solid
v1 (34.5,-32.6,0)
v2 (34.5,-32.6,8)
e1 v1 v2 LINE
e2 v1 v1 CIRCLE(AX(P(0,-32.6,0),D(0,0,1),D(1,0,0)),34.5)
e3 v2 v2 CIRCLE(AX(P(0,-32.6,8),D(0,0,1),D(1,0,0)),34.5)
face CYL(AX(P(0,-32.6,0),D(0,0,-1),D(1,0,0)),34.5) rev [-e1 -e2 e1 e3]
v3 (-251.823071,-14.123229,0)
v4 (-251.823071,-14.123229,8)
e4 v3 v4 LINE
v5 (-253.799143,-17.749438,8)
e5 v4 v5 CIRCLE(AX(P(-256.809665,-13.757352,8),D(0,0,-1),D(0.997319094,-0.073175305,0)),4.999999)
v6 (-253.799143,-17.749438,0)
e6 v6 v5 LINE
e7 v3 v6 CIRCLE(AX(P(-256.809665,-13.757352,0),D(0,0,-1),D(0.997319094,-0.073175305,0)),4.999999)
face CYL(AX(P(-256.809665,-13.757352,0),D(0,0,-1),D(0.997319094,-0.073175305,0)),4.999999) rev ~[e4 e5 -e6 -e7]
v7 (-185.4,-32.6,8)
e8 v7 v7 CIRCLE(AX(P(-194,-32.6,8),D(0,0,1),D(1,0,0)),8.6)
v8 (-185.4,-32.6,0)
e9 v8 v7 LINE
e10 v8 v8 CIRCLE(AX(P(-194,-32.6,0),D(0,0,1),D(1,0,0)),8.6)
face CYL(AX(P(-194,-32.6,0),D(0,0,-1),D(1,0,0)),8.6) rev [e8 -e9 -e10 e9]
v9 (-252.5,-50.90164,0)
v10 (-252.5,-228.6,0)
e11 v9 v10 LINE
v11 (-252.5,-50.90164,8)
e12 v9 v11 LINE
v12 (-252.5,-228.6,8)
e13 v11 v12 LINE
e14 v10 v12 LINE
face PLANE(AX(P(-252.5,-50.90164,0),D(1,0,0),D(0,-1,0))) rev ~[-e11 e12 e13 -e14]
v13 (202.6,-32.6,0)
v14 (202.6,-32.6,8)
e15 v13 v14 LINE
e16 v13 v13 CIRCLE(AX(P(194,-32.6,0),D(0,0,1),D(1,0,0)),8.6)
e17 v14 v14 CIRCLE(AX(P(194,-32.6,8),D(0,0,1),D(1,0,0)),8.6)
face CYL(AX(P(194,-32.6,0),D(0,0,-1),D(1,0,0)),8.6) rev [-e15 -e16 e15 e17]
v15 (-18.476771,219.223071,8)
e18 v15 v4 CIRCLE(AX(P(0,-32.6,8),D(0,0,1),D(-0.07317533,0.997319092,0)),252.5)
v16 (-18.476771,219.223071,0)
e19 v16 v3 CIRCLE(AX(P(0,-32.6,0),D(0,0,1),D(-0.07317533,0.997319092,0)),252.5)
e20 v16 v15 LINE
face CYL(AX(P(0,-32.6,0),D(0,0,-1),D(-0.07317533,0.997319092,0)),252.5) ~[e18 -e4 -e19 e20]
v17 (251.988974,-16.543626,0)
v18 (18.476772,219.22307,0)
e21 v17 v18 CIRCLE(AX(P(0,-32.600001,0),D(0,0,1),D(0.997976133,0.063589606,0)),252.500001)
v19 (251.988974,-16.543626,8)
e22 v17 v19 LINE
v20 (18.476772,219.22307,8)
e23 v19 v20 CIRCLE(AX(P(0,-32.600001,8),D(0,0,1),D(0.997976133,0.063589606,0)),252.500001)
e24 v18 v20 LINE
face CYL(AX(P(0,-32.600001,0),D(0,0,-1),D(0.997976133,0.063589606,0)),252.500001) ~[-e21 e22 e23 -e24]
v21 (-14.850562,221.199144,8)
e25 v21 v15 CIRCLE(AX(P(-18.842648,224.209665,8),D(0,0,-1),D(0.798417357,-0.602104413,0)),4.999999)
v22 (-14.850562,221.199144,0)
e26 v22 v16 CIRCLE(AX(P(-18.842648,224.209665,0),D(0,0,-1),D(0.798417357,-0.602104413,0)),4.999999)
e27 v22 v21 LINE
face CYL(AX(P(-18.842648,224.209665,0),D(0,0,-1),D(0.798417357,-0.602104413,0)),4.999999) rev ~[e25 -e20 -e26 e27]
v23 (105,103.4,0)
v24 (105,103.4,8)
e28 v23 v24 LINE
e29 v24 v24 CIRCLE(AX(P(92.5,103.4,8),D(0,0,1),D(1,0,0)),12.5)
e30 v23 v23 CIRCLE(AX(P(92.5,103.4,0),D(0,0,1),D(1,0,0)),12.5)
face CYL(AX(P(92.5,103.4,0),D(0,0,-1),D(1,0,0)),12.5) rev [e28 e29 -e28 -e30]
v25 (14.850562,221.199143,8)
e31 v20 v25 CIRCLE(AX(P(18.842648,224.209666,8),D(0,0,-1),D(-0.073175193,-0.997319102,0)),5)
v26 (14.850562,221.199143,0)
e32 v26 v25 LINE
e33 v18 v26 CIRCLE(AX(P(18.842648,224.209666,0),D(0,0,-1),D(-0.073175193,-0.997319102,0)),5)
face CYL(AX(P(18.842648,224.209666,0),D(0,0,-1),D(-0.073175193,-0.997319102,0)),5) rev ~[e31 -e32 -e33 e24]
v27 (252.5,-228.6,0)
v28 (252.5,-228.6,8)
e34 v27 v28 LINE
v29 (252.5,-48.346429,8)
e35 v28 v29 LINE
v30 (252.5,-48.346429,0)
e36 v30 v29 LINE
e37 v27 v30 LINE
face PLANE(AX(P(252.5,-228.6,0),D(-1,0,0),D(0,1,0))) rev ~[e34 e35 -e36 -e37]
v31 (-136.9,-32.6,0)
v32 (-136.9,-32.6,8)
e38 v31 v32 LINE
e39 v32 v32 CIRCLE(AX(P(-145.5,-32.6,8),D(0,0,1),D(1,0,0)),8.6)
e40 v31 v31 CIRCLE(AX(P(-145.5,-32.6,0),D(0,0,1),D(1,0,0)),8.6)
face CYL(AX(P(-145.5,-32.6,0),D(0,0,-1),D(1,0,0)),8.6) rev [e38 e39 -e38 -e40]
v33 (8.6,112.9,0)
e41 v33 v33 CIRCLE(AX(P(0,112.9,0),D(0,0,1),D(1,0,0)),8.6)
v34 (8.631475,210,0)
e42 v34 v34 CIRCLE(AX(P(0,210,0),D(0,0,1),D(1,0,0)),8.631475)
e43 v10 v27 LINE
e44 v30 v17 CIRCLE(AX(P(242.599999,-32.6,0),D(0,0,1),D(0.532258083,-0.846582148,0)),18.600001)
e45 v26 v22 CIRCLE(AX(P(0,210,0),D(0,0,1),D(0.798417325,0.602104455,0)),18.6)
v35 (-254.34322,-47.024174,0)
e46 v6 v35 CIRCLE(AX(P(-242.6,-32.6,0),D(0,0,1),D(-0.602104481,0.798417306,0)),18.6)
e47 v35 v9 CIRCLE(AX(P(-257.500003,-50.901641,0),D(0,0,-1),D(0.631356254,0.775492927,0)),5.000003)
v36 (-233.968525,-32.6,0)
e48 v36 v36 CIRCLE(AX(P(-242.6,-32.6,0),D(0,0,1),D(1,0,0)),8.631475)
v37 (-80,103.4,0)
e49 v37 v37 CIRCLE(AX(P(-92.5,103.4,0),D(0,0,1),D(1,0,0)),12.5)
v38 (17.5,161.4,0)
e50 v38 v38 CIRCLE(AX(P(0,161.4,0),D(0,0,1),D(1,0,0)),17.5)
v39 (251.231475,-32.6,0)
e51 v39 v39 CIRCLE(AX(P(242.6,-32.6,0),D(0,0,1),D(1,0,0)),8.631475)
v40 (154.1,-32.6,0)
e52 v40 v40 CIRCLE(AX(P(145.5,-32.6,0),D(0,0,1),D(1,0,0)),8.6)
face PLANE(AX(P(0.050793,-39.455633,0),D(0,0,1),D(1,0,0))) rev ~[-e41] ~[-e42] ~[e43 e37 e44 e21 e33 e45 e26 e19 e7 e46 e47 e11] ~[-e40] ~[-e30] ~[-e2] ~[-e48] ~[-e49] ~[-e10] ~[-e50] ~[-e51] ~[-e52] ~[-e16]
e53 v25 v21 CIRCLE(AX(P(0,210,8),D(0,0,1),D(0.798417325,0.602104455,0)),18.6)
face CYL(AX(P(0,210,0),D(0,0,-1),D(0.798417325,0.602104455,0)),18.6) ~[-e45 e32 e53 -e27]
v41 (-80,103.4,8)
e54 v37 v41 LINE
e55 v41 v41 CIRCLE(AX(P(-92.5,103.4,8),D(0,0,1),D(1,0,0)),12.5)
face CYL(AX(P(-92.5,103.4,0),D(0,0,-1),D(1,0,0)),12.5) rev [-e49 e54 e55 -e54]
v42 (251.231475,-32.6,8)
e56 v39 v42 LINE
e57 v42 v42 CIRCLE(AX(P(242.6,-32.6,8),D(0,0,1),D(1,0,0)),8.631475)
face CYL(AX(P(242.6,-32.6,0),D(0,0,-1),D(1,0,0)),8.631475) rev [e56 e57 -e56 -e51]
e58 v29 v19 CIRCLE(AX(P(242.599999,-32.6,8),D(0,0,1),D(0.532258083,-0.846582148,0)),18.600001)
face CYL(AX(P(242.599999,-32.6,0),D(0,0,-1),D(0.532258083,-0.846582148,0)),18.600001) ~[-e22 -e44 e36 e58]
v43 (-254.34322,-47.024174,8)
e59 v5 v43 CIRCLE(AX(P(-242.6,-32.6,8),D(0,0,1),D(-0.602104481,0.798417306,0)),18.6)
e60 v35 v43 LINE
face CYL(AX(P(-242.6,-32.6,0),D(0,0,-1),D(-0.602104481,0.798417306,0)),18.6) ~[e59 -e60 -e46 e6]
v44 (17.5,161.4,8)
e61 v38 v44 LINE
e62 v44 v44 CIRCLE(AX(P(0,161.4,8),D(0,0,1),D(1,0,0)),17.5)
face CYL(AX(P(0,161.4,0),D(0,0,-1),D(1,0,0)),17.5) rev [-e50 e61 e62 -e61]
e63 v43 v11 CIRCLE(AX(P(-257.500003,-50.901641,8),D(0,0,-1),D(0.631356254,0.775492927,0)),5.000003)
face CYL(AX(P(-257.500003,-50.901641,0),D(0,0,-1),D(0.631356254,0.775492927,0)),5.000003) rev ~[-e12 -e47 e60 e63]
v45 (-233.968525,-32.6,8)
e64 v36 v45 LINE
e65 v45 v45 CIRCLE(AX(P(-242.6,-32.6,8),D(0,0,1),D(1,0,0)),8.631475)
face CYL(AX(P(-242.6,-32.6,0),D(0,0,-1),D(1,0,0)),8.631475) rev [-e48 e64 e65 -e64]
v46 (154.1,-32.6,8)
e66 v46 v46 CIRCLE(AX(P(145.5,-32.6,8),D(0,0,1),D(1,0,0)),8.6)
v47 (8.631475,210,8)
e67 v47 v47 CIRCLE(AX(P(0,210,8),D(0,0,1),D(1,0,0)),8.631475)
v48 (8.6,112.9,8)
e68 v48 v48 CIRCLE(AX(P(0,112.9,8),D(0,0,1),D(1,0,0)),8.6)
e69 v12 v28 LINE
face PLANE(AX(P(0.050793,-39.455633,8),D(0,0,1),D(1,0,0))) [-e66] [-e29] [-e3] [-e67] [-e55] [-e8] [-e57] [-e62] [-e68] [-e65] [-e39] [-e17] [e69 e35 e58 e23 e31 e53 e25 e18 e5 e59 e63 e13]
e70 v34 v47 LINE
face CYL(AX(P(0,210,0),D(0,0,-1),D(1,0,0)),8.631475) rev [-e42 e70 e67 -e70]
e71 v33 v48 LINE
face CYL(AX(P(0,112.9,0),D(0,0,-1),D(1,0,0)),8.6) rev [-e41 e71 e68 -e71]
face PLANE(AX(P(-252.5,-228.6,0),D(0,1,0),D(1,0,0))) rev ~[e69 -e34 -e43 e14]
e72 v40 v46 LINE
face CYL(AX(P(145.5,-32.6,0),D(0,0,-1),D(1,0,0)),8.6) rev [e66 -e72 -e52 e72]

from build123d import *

# Parameters (mm, degrees)
F0_R     = 8.631475
F0_R_2   = 8.6
F0_R_3   = 34.5
F0_R_4   = 12.5
F0_R_5   = 17.5
F1_DEPTH = 8


# Not quite as in the source:
# - ends of sketch curves that miss each other by under 0.0002 mm in the source are joined


with BuildPart() as f1:
    # F0 (on Top) → F1 (new body)
    with BuildSketch(Plane.XY):
        with BuildLine():
            ThreePointArc((18.476772036, 219.2230704901), (16.4501234267, 219.819241628), (14.8505619493, 221.1991429618))
            ThreePointArc((14.8505619493, 221.1991429618), (3.011e-07, 228.6), (-14.8505617308, 221.1991435511))
            ThreePointArc((-14.8505617308, 221.1991435511), (-16.4501227245, 219.8192420107), (-18.4767710413, 219.2230705631))
            ThreePointArc((-18.4767710413, 219.2230705631), (-178.5444622496, 145.9444622496), (-251.8230706896, -14.1232289494))
            ThreePointArc((-251.8230706896, -14.1232289494), (-252.4192420107, -16.1498772755), (-253.7991434425, -17.7494384132))
            ThreePointArc((-253.7991434425, -17.7494384132), (-261.1967885287, -32.2543753223), (-254.343219804, -47.0241737592))
            ThreePointArc((-254.343219804, -47.0241737592), (-252.9842553662, -48.7550030017), (-252.5, -50.90164))
            Line((-252.5, -50.90164), (-252.5, -228.6))
            Line((-252.5, -228.6), (252.5, -228.6))
            Line((252.5, -228.6), (252.5, -48.346429))
            ThreePointArc((252.5, -48.346429), (261.1975992169, -32.3011633084), (251.9889742877, -16.5436255081))
            ThreePointArc((251.9889742877, -16.5436255081), (179.4001497018, 145.0846540559), (18.476772036, 219.2230704901))
        make_face()
        with Locations((-242.6, -32.6)):
            Circle(F0_R, mode=Mode.SUBTRACT)
        with Locations((-194, -32.6)):
            Circle(F0_R_2, mode=Mode.SUBTRACT)
        with Locations((-145.5, -32.6)):
            Circle(F0_R_2, mode=Mode.SUBTRACT)
        with Locations((0, -32.6)):
            Circle(F0_R_3, mode=Mode.SUBTRACT)
        with Locations((145.5, -32.6)):
            Circle(F0_R_2, mode=Mode.SUBTRACT)
        with Locations((194, -32.6)):
            Circle(F0_R_2, mode=Mode.SUBTRACT)
        with Locations((242.6, -32.6)):
            Circle(F0_R, mode=Mode.SUBTRACT)
        with Locations((-92.5, 103.4)):
            Circle(F0_R_4, mode=Mode.SUBTRACT)
        with Locations((0, 112.9)):
            Circle(F0_R_2, mode=Mode.SUBTRACT)
        with Locations((92.5, 103.4)):
            Circle(F0_R_4, mode=Mode.SUBTRACT)
        with Locations((0, 161.4)):
            Circle(F0_R_5, mode=Mode.SUBTRACT)
        with Locations((0, 210)):
            Circle(F0_R, mode=Mode.SUBTRACT)
    extrude(amount=F1_DEPTH)


solid = f1.part
